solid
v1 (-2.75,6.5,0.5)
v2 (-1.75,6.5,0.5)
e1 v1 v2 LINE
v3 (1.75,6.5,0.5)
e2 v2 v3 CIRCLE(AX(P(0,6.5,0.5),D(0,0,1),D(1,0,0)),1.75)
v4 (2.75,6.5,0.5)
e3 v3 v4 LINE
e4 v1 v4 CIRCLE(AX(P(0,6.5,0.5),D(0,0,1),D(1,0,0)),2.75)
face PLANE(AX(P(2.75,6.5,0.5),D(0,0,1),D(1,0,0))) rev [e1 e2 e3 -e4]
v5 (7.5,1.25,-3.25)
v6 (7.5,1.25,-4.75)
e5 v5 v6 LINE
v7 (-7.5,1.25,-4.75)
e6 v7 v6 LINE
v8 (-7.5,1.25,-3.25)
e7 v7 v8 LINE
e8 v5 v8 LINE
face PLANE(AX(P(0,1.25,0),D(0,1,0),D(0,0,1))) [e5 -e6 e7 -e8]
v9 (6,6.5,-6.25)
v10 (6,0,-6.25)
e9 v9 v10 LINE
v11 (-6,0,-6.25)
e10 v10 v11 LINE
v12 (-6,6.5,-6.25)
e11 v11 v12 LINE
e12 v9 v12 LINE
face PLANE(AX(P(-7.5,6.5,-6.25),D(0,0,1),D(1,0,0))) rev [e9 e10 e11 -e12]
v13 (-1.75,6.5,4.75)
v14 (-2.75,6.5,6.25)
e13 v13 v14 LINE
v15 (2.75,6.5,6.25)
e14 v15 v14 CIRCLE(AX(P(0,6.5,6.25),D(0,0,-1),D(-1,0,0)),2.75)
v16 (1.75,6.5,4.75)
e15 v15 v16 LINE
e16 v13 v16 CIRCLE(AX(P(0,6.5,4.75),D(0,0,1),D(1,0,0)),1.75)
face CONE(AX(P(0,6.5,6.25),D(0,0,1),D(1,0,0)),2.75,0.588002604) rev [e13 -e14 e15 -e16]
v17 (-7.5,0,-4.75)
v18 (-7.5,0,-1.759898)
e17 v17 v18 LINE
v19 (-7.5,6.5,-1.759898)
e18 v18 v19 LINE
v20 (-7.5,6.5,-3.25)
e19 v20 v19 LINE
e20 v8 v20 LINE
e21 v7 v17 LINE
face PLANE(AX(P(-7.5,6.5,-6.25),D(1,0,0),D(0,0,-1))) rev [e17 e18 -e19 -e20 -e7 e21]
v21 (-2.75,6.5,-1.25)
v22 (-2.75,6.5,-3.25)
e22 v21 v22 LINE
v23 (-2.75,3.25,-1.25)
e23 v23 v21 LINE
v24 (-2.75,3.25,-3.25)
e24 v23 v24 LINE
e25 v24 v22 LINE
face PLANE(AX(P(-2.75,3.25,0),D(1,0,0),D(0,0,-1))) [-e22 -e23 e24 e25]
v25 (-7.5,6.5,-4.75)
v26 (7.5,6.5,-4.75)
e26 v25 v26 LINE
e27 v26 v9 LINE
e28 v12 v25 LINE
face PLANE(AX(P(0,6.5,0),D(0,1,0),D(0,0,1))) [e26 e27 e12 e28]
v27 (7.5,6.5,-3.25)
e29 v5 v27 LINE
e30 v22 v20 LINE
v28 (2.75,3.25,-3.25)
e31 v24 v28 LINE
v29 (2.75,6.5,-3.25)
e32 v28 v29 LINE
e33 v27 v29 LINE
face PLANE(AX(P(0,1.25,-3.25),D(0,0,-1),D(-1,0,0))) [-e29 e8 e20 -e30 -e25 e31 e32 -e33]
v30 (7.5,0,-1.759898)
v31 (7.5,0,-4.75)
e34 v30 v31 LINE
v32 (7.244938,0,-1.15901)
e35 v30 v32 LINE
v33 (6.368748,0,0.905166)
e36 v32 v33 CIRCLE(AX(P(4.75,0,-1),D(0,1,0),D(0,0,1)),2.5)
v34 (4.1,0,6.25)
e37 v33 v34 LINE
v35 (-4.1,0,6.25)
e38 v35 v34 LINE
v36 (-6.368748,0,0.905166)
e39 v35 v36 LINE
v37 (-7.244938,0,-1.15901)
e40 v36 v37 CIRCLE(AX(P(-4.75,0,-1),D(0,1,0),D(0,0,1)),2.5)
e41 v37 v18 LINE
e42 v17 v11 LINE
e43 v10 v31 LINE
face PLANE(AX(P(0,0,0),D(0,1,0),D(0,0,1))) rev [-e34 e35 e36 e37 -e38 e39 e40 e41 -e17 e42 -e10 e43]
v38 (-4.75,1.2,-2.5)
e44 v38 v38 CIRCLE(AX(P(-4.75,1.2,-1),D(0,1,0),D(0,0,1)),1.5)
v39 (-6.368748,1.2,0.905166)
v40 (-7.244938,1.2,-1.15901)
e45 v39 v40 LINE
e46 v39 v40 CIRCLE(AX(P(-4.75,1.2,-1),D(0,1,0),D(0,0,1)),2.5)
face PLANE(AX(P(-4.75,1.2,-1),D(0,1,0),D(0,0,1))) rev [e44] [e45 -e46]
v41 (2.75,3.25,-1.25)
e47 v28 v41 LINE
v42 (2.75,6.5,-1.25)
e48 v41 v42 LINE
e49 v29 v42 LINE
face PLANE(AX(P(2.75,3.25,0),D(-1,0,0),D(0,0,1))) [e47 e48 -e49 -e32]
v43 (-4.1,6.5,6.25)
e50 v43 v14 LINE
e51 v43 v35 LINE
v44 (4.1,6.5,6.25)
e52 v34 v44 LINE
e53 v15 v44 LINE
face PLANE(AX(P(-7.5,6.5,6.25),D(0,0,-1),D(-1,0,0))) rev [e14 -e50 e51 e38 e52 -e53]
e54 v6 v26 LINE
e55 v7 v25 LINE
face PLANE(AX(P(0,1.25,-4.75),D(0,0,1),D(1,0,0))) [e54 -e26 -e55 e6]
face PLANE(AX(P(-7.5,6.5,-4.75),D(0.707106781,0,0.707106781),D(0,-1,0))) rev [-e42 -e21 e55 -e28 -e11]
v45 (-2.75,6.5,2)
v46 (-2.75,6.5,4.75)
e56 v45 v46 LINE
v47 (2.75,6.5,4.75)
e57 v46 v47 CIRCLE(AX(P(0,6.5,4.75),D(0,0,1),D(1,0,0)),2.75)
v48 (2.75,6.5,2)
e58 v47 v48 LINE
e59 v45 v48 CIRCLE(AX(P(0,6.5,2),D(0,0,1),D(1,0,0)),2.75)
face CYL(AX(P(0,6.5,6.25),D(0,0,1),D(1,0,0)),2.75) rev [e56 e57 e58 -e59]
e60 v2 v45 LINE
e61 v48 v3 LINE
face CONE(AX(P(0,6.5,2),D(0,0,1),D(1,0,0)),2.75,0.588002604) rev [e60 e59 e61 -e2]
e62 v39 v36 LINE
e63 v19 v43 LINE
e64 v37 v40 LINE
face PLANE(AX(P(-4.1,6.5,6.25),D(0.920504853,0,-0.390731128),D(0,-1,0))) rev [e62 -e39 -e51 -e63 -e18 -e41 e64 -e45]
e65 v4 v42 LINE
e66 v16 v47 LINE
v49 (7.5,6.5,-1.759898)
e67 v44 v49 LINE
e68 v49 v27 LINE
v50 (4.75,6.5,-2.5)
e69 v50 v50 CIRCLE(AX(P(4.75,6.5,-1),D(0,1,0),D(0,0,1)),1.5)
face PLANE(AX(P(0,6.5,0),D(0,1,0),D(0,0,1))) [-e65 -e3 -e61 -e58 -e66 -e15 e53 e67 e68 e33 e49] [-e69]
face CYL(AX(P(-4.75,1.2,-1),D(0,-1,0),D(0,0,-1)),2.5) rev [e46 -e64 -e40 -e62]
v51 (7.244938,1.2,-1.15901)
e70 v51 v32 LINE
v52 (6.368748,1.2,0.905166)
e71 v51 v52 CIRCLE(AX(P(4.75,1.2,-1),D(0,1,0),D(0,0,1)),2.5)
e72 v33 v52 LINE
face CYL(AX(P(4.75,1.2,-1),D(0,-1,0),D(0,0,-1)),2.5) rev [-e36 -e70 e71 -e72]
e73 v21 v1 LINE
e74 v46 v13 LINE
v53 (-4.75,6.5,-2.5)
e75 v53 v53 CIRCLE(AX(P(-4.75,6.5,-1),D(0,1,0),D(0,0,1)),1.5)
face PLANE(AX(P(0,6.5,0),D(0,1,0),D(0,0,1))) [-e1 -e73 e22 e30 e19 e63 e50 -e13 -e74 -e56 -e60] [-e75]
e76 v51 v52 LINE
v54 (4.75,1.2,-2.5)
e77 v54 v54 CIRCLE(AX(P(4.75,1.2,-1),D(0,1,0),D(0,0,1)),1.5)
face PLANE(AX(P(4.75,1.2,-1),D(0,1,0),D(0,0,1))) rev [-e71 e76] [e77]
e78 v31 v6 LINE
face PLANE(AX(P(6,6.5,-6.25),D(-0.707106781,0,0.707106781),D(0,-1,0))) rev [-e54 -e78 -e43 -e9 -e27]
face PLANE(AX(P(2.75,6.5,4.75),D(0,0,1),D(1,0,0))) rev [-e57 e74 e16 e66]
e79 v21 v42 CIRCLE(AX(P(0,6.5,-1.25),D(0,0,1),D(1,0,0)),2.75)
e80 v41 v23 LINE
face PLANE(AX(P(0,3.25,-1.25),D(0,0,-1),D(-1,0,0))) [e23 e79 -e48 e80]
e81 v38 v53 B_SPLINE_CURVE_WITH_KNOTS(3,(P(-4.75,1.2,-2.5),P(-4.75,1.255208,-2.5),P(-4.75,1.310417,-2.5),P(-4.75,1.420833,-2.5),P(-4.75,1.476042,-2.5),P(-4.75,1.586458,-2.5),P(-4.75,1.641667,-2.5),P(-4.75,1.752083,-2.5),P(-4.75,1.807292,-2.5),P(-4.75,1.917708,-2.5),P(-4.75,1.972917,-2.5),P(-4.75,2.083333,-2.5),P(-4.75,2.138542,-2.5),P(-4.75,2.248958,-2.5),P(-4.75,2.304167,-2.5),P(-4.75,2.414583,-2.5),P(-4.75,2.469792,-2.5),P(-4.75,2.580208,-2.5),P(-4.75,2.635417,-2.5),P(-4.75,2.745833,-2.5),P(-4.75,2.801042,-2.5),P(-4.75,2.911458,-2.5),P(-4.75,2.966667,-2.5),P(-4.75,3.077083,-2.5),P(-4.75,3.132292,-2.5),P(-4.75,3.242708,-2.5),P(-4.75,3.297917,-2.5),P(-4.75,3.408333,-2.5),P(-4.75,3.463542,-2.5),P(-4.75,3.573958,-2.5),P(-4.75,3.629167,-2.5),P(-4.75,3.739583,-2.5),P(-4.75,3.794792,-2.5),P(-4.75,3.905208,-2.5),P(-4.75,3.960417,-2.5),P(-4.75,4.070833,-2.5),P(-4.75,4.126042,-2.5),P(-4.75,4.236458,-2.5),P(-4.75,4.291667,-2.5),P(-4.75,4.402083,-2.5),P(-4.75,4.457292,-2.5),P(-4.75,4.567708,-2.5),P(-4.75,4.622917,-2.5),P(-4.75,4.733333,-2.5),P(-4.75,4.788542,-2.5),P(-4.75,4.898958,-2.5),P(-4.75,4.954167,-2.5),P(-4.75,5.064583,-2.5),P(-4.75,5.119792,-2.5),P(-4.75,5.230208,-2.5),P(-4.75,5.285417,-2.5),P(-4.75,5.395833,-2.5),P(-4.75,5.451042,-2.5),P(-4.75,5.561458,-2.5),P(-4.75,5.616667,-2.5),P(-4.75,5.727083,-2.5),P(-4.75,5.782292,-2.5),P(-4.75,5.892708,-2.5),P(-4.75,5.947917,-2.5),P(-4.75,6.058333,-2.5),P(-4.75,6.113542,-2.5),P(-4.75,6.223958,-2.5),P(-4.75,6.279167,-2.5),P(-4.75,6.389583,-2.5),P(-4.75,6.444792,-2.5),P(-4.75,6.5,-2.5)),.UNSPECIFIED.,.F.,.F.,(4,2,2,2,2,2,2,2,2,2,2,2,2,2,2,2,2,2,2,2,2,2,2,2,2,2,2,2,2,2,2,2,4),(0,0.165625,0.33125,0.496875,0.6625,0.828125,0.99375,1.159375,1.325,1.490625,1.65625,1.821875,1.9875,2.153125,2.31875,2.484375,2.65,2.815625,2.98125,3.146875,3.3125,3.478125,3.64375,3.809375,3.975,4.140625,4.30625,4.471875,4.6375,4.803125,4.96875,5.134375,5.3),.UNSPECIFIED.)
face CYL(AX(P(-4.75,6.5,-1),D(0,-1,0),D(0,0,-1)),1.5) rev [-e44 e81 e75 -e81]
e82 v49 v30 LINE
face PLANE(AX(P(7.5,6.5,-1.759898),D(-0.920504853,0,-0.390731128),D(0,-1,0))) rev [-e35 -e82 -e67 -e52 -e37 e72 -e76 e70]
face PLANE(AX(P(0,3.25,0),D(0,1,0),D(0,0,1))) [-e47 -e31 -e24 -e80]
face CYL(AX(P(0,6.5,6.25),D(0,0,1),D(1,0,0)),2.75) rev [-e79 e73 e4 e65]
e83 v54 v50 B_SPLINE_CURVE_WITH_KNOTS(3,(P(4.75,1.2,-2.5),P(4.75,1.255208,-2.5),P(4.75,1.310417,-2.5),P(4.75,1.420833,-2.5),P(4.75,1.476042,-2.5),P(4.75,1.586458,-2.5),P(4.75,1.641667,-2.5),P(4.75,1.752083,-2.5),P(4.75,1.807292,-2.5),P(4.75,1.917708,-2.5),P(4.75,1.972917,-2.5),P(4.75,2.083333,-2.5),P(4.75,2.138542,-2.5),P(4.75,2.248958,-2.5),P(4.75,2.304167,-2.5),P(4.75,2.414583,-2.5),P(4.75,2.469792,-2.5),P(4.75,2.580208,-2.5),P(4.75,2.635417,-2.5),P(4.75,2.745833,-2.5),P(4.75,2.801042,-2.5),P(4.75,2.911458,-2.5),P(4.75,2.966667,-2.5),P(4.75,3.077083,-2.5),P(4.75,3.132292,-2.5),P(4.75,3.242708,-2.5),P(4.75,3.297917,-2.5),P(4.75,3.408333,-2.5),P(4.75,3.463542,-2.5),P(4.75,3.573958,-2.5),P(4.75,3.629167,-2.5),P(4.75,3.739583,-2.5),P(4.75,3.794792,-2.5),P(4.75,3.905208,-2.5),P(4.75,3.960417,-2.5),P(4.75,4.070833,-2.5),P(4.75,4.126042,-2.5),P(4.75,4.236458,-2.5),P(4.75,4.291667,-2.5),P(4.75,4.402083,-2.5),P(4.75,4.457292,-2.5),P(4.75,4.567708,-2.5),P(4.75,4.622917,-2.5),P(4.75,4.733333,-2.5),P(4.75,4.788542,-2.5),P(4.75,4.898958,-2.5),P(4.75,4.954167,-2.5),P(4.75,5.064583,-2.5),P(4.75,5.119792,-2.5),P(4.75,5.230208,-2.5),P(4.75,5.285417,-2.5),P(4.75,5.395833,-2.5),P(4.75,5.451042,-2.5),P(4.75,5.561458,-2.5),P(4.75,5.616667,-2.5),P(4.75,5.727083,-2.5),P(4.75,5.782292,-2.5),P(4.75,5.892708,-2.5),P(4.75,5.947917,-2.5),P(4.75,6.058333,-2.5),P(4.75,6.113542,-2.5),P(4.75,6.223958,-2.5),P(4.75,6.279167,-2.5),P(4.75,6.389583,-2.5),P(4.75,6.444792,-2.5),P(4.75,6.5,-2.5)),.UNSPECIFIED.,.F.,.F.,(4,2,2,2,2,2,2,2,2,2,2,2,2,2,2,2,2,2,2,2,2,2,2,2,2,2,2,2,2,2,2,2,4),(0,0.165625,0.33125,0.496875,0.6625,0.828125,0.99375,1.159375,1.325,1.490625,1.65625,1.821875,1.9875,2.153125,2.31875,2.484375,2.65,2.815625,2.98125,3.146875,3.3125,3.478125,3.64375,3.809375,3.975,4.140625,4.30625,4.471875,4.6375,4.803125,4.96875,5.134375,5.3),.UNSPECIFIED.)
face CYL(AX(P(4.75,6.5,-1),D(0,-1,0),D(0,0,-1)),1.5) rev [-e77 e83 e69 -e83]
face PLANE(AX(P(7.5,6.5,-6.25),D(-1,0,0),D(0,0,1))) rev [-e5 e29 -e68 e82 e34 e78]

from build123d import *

# Parameters (mm, degrees)
SKETCH1_W           = 15
SKETCH1_H           = 12.5
BOSS_EXTRUDE1_DEPTH = 6.5
SKETCH2_R           = 1.5
CUT_EXTRUDE1_DEPTH  = 12.728704106
CHAMFER1_SIZE       = 3.4
CHAMFER1_SIZE2      = 8.009898044
SKETCH2_3_R         = 2.5
SKETCH2_3_R_2       = 1.5
CUT_EXTRUDE5_DEPTH  = 1.2
CUT_EXTRUDE4_DEPTH  = 5.25
SKETCH3_W           = 5.5
SKETCH3_H           = 2
CUT_EXTRUDE3_DEPTH  = 3.25
CHAMFER2_SIZE       = 1.5


with BuildPart() as part:
    # Sketch1 → Boss-Extrude1 (new body)
    with BuildSketch(Plane(origin=(0, 0, 0), x_dir=(1, 0, 0), z_dir=(0, 1, 0))):
        Rectangle(SKETCH1_W, SKETCH1_H)
    extrude(amount=BOSS_EXTRUDE1_DEPTH)

    # Sketch2 → Cut-Extrude1 (cut, through all)
    with BuildSketch(Plane(origin=(0, 0, 0), x_dir=(1, 0, 0), z_dir=(0, 1, 0))):
        with Locations(Location((4.75, 1, 0), (0, 0, 90))):
            Circle(SKETCH2_R)
        with Locations(Location((-4.75, 1, 0), (0, 0, 90))):
            Circle(SKETCH2_R)
    extrude(amount=CUT_EXTRUDE1_DEPTH, mode=Mode.SUBTRACT)

    # Chamfer1
    chamfer1_edges = [part.edges().sort_by_distance(p)[0] for p in [
        (7.5, 3.25, 6.25),
        (-7.5, 3.25, 6.25),
    ]]
    chamfer1_side = [part.faces().sort_by_distance(p)[0] for p in [
        (0, 3.25, 6.25),
    ]]
    chamfer(chamfer1_edges, length=CHAMFER1_SIZE, length2=CHAMFER1_SIZE2, reference=chamfer1_side[0])

    # Sketch2<3> → Cut-Extrude5 (cut)
    # profile 1 of 2: a face of its own
    with BuildSketch(Plane(origin=(0, 0, 0), x_dir=(1, 0, 0), z_dir=(0, 1, 0))):
        with Locations((4.75, 1)):
            Circle(SKETCH2_3_R)
        with Locations(Location((4.75, 1, 0), (0, 0, 90))):
            Circle(SKETCH2_3_R_2, mode=Mode.SUBTRACT)
    # profile 2 of 2: a face of its own
    with BuildSketch(Plane(origin=(0, 0, 0), x_dir=(1, 0, 0), z_dir=(0, 1, 0))):
        with Locations((-4.75, 1)):
            Circle(SKETCH2_3_R)
        with Locations(Location((-4.75, 1, 0), (0, 0, 90))):
            Circle(SKETCH2_3_R_2, mode=Mode.SUBTRACT)
    extrude(amount=CUT_EXTRUDE5_DEPTH, mode=Mode.SUBTRACT)

    # Sketch3<3> → Cut-Extrude4 (cut)
    with BuildSketch(Plane(origin=(0, 6.5, 0), x_dir=(1, 0, 0), z_dir=(0, 1, 0))):
        Polygon((7.5, 4.75), (-7.5, 4.75), (-7.5, 3.25), (-2.75, 3.25), (2.75, 3.25), (7.5, 3.25), align=None)
    extrude(amount=-CUT_EXTRUDE4_DEPTH, mode=Mode.SUBTRACT)

    # Sketch4 → Cut-Revolve1 (revolve, cut)
    with BuildSketch(Plane(origin=(0, 6.5, 0), x_dir=(1, 0, 0), z_dir=(0, 1, 0))):
        Polygon((2.75, 1.25), (2.75, -0.5), (1.75, -0.5), (2.75, -2), (2.75, -4.75), (1.75, -4.75), (2.75, -6.25), (0, -6.25), (0, 1.25), align=None)
    revolve(axis=Axis((0, 6.5, 6.25), (0, 0, -1)), mode=Mode.SUBTRACT)

    # Sketch3 → Cut-Extrude3 (cut)
    with BuildSketch(Plane(origin=(0, 6.5, 0), x_dir=(1, 0, 0), z_dir=(0, 1, 0))):
        with Locations((0, 2.25)):
            Rectangle(SKETCH3_W, SKETCH3_H)
    extrude(amount=-CUT_EXTRUDE3_DEPTH, mode=Mode.SUBTRACT)

    # Chamfer2
    chamfer2_edges = [part.edges().sort_by_distance(p)[0] for p in [
        (-7.5, 3.25, -6.25),
        (7.5, 3.25, -6.25),
    ]]
    chamfer(chamfer2_edges, length=CHAMFER2_SIZE - 0.0001)  # a hair under: the kernel refuses the full size


solid = part.part
